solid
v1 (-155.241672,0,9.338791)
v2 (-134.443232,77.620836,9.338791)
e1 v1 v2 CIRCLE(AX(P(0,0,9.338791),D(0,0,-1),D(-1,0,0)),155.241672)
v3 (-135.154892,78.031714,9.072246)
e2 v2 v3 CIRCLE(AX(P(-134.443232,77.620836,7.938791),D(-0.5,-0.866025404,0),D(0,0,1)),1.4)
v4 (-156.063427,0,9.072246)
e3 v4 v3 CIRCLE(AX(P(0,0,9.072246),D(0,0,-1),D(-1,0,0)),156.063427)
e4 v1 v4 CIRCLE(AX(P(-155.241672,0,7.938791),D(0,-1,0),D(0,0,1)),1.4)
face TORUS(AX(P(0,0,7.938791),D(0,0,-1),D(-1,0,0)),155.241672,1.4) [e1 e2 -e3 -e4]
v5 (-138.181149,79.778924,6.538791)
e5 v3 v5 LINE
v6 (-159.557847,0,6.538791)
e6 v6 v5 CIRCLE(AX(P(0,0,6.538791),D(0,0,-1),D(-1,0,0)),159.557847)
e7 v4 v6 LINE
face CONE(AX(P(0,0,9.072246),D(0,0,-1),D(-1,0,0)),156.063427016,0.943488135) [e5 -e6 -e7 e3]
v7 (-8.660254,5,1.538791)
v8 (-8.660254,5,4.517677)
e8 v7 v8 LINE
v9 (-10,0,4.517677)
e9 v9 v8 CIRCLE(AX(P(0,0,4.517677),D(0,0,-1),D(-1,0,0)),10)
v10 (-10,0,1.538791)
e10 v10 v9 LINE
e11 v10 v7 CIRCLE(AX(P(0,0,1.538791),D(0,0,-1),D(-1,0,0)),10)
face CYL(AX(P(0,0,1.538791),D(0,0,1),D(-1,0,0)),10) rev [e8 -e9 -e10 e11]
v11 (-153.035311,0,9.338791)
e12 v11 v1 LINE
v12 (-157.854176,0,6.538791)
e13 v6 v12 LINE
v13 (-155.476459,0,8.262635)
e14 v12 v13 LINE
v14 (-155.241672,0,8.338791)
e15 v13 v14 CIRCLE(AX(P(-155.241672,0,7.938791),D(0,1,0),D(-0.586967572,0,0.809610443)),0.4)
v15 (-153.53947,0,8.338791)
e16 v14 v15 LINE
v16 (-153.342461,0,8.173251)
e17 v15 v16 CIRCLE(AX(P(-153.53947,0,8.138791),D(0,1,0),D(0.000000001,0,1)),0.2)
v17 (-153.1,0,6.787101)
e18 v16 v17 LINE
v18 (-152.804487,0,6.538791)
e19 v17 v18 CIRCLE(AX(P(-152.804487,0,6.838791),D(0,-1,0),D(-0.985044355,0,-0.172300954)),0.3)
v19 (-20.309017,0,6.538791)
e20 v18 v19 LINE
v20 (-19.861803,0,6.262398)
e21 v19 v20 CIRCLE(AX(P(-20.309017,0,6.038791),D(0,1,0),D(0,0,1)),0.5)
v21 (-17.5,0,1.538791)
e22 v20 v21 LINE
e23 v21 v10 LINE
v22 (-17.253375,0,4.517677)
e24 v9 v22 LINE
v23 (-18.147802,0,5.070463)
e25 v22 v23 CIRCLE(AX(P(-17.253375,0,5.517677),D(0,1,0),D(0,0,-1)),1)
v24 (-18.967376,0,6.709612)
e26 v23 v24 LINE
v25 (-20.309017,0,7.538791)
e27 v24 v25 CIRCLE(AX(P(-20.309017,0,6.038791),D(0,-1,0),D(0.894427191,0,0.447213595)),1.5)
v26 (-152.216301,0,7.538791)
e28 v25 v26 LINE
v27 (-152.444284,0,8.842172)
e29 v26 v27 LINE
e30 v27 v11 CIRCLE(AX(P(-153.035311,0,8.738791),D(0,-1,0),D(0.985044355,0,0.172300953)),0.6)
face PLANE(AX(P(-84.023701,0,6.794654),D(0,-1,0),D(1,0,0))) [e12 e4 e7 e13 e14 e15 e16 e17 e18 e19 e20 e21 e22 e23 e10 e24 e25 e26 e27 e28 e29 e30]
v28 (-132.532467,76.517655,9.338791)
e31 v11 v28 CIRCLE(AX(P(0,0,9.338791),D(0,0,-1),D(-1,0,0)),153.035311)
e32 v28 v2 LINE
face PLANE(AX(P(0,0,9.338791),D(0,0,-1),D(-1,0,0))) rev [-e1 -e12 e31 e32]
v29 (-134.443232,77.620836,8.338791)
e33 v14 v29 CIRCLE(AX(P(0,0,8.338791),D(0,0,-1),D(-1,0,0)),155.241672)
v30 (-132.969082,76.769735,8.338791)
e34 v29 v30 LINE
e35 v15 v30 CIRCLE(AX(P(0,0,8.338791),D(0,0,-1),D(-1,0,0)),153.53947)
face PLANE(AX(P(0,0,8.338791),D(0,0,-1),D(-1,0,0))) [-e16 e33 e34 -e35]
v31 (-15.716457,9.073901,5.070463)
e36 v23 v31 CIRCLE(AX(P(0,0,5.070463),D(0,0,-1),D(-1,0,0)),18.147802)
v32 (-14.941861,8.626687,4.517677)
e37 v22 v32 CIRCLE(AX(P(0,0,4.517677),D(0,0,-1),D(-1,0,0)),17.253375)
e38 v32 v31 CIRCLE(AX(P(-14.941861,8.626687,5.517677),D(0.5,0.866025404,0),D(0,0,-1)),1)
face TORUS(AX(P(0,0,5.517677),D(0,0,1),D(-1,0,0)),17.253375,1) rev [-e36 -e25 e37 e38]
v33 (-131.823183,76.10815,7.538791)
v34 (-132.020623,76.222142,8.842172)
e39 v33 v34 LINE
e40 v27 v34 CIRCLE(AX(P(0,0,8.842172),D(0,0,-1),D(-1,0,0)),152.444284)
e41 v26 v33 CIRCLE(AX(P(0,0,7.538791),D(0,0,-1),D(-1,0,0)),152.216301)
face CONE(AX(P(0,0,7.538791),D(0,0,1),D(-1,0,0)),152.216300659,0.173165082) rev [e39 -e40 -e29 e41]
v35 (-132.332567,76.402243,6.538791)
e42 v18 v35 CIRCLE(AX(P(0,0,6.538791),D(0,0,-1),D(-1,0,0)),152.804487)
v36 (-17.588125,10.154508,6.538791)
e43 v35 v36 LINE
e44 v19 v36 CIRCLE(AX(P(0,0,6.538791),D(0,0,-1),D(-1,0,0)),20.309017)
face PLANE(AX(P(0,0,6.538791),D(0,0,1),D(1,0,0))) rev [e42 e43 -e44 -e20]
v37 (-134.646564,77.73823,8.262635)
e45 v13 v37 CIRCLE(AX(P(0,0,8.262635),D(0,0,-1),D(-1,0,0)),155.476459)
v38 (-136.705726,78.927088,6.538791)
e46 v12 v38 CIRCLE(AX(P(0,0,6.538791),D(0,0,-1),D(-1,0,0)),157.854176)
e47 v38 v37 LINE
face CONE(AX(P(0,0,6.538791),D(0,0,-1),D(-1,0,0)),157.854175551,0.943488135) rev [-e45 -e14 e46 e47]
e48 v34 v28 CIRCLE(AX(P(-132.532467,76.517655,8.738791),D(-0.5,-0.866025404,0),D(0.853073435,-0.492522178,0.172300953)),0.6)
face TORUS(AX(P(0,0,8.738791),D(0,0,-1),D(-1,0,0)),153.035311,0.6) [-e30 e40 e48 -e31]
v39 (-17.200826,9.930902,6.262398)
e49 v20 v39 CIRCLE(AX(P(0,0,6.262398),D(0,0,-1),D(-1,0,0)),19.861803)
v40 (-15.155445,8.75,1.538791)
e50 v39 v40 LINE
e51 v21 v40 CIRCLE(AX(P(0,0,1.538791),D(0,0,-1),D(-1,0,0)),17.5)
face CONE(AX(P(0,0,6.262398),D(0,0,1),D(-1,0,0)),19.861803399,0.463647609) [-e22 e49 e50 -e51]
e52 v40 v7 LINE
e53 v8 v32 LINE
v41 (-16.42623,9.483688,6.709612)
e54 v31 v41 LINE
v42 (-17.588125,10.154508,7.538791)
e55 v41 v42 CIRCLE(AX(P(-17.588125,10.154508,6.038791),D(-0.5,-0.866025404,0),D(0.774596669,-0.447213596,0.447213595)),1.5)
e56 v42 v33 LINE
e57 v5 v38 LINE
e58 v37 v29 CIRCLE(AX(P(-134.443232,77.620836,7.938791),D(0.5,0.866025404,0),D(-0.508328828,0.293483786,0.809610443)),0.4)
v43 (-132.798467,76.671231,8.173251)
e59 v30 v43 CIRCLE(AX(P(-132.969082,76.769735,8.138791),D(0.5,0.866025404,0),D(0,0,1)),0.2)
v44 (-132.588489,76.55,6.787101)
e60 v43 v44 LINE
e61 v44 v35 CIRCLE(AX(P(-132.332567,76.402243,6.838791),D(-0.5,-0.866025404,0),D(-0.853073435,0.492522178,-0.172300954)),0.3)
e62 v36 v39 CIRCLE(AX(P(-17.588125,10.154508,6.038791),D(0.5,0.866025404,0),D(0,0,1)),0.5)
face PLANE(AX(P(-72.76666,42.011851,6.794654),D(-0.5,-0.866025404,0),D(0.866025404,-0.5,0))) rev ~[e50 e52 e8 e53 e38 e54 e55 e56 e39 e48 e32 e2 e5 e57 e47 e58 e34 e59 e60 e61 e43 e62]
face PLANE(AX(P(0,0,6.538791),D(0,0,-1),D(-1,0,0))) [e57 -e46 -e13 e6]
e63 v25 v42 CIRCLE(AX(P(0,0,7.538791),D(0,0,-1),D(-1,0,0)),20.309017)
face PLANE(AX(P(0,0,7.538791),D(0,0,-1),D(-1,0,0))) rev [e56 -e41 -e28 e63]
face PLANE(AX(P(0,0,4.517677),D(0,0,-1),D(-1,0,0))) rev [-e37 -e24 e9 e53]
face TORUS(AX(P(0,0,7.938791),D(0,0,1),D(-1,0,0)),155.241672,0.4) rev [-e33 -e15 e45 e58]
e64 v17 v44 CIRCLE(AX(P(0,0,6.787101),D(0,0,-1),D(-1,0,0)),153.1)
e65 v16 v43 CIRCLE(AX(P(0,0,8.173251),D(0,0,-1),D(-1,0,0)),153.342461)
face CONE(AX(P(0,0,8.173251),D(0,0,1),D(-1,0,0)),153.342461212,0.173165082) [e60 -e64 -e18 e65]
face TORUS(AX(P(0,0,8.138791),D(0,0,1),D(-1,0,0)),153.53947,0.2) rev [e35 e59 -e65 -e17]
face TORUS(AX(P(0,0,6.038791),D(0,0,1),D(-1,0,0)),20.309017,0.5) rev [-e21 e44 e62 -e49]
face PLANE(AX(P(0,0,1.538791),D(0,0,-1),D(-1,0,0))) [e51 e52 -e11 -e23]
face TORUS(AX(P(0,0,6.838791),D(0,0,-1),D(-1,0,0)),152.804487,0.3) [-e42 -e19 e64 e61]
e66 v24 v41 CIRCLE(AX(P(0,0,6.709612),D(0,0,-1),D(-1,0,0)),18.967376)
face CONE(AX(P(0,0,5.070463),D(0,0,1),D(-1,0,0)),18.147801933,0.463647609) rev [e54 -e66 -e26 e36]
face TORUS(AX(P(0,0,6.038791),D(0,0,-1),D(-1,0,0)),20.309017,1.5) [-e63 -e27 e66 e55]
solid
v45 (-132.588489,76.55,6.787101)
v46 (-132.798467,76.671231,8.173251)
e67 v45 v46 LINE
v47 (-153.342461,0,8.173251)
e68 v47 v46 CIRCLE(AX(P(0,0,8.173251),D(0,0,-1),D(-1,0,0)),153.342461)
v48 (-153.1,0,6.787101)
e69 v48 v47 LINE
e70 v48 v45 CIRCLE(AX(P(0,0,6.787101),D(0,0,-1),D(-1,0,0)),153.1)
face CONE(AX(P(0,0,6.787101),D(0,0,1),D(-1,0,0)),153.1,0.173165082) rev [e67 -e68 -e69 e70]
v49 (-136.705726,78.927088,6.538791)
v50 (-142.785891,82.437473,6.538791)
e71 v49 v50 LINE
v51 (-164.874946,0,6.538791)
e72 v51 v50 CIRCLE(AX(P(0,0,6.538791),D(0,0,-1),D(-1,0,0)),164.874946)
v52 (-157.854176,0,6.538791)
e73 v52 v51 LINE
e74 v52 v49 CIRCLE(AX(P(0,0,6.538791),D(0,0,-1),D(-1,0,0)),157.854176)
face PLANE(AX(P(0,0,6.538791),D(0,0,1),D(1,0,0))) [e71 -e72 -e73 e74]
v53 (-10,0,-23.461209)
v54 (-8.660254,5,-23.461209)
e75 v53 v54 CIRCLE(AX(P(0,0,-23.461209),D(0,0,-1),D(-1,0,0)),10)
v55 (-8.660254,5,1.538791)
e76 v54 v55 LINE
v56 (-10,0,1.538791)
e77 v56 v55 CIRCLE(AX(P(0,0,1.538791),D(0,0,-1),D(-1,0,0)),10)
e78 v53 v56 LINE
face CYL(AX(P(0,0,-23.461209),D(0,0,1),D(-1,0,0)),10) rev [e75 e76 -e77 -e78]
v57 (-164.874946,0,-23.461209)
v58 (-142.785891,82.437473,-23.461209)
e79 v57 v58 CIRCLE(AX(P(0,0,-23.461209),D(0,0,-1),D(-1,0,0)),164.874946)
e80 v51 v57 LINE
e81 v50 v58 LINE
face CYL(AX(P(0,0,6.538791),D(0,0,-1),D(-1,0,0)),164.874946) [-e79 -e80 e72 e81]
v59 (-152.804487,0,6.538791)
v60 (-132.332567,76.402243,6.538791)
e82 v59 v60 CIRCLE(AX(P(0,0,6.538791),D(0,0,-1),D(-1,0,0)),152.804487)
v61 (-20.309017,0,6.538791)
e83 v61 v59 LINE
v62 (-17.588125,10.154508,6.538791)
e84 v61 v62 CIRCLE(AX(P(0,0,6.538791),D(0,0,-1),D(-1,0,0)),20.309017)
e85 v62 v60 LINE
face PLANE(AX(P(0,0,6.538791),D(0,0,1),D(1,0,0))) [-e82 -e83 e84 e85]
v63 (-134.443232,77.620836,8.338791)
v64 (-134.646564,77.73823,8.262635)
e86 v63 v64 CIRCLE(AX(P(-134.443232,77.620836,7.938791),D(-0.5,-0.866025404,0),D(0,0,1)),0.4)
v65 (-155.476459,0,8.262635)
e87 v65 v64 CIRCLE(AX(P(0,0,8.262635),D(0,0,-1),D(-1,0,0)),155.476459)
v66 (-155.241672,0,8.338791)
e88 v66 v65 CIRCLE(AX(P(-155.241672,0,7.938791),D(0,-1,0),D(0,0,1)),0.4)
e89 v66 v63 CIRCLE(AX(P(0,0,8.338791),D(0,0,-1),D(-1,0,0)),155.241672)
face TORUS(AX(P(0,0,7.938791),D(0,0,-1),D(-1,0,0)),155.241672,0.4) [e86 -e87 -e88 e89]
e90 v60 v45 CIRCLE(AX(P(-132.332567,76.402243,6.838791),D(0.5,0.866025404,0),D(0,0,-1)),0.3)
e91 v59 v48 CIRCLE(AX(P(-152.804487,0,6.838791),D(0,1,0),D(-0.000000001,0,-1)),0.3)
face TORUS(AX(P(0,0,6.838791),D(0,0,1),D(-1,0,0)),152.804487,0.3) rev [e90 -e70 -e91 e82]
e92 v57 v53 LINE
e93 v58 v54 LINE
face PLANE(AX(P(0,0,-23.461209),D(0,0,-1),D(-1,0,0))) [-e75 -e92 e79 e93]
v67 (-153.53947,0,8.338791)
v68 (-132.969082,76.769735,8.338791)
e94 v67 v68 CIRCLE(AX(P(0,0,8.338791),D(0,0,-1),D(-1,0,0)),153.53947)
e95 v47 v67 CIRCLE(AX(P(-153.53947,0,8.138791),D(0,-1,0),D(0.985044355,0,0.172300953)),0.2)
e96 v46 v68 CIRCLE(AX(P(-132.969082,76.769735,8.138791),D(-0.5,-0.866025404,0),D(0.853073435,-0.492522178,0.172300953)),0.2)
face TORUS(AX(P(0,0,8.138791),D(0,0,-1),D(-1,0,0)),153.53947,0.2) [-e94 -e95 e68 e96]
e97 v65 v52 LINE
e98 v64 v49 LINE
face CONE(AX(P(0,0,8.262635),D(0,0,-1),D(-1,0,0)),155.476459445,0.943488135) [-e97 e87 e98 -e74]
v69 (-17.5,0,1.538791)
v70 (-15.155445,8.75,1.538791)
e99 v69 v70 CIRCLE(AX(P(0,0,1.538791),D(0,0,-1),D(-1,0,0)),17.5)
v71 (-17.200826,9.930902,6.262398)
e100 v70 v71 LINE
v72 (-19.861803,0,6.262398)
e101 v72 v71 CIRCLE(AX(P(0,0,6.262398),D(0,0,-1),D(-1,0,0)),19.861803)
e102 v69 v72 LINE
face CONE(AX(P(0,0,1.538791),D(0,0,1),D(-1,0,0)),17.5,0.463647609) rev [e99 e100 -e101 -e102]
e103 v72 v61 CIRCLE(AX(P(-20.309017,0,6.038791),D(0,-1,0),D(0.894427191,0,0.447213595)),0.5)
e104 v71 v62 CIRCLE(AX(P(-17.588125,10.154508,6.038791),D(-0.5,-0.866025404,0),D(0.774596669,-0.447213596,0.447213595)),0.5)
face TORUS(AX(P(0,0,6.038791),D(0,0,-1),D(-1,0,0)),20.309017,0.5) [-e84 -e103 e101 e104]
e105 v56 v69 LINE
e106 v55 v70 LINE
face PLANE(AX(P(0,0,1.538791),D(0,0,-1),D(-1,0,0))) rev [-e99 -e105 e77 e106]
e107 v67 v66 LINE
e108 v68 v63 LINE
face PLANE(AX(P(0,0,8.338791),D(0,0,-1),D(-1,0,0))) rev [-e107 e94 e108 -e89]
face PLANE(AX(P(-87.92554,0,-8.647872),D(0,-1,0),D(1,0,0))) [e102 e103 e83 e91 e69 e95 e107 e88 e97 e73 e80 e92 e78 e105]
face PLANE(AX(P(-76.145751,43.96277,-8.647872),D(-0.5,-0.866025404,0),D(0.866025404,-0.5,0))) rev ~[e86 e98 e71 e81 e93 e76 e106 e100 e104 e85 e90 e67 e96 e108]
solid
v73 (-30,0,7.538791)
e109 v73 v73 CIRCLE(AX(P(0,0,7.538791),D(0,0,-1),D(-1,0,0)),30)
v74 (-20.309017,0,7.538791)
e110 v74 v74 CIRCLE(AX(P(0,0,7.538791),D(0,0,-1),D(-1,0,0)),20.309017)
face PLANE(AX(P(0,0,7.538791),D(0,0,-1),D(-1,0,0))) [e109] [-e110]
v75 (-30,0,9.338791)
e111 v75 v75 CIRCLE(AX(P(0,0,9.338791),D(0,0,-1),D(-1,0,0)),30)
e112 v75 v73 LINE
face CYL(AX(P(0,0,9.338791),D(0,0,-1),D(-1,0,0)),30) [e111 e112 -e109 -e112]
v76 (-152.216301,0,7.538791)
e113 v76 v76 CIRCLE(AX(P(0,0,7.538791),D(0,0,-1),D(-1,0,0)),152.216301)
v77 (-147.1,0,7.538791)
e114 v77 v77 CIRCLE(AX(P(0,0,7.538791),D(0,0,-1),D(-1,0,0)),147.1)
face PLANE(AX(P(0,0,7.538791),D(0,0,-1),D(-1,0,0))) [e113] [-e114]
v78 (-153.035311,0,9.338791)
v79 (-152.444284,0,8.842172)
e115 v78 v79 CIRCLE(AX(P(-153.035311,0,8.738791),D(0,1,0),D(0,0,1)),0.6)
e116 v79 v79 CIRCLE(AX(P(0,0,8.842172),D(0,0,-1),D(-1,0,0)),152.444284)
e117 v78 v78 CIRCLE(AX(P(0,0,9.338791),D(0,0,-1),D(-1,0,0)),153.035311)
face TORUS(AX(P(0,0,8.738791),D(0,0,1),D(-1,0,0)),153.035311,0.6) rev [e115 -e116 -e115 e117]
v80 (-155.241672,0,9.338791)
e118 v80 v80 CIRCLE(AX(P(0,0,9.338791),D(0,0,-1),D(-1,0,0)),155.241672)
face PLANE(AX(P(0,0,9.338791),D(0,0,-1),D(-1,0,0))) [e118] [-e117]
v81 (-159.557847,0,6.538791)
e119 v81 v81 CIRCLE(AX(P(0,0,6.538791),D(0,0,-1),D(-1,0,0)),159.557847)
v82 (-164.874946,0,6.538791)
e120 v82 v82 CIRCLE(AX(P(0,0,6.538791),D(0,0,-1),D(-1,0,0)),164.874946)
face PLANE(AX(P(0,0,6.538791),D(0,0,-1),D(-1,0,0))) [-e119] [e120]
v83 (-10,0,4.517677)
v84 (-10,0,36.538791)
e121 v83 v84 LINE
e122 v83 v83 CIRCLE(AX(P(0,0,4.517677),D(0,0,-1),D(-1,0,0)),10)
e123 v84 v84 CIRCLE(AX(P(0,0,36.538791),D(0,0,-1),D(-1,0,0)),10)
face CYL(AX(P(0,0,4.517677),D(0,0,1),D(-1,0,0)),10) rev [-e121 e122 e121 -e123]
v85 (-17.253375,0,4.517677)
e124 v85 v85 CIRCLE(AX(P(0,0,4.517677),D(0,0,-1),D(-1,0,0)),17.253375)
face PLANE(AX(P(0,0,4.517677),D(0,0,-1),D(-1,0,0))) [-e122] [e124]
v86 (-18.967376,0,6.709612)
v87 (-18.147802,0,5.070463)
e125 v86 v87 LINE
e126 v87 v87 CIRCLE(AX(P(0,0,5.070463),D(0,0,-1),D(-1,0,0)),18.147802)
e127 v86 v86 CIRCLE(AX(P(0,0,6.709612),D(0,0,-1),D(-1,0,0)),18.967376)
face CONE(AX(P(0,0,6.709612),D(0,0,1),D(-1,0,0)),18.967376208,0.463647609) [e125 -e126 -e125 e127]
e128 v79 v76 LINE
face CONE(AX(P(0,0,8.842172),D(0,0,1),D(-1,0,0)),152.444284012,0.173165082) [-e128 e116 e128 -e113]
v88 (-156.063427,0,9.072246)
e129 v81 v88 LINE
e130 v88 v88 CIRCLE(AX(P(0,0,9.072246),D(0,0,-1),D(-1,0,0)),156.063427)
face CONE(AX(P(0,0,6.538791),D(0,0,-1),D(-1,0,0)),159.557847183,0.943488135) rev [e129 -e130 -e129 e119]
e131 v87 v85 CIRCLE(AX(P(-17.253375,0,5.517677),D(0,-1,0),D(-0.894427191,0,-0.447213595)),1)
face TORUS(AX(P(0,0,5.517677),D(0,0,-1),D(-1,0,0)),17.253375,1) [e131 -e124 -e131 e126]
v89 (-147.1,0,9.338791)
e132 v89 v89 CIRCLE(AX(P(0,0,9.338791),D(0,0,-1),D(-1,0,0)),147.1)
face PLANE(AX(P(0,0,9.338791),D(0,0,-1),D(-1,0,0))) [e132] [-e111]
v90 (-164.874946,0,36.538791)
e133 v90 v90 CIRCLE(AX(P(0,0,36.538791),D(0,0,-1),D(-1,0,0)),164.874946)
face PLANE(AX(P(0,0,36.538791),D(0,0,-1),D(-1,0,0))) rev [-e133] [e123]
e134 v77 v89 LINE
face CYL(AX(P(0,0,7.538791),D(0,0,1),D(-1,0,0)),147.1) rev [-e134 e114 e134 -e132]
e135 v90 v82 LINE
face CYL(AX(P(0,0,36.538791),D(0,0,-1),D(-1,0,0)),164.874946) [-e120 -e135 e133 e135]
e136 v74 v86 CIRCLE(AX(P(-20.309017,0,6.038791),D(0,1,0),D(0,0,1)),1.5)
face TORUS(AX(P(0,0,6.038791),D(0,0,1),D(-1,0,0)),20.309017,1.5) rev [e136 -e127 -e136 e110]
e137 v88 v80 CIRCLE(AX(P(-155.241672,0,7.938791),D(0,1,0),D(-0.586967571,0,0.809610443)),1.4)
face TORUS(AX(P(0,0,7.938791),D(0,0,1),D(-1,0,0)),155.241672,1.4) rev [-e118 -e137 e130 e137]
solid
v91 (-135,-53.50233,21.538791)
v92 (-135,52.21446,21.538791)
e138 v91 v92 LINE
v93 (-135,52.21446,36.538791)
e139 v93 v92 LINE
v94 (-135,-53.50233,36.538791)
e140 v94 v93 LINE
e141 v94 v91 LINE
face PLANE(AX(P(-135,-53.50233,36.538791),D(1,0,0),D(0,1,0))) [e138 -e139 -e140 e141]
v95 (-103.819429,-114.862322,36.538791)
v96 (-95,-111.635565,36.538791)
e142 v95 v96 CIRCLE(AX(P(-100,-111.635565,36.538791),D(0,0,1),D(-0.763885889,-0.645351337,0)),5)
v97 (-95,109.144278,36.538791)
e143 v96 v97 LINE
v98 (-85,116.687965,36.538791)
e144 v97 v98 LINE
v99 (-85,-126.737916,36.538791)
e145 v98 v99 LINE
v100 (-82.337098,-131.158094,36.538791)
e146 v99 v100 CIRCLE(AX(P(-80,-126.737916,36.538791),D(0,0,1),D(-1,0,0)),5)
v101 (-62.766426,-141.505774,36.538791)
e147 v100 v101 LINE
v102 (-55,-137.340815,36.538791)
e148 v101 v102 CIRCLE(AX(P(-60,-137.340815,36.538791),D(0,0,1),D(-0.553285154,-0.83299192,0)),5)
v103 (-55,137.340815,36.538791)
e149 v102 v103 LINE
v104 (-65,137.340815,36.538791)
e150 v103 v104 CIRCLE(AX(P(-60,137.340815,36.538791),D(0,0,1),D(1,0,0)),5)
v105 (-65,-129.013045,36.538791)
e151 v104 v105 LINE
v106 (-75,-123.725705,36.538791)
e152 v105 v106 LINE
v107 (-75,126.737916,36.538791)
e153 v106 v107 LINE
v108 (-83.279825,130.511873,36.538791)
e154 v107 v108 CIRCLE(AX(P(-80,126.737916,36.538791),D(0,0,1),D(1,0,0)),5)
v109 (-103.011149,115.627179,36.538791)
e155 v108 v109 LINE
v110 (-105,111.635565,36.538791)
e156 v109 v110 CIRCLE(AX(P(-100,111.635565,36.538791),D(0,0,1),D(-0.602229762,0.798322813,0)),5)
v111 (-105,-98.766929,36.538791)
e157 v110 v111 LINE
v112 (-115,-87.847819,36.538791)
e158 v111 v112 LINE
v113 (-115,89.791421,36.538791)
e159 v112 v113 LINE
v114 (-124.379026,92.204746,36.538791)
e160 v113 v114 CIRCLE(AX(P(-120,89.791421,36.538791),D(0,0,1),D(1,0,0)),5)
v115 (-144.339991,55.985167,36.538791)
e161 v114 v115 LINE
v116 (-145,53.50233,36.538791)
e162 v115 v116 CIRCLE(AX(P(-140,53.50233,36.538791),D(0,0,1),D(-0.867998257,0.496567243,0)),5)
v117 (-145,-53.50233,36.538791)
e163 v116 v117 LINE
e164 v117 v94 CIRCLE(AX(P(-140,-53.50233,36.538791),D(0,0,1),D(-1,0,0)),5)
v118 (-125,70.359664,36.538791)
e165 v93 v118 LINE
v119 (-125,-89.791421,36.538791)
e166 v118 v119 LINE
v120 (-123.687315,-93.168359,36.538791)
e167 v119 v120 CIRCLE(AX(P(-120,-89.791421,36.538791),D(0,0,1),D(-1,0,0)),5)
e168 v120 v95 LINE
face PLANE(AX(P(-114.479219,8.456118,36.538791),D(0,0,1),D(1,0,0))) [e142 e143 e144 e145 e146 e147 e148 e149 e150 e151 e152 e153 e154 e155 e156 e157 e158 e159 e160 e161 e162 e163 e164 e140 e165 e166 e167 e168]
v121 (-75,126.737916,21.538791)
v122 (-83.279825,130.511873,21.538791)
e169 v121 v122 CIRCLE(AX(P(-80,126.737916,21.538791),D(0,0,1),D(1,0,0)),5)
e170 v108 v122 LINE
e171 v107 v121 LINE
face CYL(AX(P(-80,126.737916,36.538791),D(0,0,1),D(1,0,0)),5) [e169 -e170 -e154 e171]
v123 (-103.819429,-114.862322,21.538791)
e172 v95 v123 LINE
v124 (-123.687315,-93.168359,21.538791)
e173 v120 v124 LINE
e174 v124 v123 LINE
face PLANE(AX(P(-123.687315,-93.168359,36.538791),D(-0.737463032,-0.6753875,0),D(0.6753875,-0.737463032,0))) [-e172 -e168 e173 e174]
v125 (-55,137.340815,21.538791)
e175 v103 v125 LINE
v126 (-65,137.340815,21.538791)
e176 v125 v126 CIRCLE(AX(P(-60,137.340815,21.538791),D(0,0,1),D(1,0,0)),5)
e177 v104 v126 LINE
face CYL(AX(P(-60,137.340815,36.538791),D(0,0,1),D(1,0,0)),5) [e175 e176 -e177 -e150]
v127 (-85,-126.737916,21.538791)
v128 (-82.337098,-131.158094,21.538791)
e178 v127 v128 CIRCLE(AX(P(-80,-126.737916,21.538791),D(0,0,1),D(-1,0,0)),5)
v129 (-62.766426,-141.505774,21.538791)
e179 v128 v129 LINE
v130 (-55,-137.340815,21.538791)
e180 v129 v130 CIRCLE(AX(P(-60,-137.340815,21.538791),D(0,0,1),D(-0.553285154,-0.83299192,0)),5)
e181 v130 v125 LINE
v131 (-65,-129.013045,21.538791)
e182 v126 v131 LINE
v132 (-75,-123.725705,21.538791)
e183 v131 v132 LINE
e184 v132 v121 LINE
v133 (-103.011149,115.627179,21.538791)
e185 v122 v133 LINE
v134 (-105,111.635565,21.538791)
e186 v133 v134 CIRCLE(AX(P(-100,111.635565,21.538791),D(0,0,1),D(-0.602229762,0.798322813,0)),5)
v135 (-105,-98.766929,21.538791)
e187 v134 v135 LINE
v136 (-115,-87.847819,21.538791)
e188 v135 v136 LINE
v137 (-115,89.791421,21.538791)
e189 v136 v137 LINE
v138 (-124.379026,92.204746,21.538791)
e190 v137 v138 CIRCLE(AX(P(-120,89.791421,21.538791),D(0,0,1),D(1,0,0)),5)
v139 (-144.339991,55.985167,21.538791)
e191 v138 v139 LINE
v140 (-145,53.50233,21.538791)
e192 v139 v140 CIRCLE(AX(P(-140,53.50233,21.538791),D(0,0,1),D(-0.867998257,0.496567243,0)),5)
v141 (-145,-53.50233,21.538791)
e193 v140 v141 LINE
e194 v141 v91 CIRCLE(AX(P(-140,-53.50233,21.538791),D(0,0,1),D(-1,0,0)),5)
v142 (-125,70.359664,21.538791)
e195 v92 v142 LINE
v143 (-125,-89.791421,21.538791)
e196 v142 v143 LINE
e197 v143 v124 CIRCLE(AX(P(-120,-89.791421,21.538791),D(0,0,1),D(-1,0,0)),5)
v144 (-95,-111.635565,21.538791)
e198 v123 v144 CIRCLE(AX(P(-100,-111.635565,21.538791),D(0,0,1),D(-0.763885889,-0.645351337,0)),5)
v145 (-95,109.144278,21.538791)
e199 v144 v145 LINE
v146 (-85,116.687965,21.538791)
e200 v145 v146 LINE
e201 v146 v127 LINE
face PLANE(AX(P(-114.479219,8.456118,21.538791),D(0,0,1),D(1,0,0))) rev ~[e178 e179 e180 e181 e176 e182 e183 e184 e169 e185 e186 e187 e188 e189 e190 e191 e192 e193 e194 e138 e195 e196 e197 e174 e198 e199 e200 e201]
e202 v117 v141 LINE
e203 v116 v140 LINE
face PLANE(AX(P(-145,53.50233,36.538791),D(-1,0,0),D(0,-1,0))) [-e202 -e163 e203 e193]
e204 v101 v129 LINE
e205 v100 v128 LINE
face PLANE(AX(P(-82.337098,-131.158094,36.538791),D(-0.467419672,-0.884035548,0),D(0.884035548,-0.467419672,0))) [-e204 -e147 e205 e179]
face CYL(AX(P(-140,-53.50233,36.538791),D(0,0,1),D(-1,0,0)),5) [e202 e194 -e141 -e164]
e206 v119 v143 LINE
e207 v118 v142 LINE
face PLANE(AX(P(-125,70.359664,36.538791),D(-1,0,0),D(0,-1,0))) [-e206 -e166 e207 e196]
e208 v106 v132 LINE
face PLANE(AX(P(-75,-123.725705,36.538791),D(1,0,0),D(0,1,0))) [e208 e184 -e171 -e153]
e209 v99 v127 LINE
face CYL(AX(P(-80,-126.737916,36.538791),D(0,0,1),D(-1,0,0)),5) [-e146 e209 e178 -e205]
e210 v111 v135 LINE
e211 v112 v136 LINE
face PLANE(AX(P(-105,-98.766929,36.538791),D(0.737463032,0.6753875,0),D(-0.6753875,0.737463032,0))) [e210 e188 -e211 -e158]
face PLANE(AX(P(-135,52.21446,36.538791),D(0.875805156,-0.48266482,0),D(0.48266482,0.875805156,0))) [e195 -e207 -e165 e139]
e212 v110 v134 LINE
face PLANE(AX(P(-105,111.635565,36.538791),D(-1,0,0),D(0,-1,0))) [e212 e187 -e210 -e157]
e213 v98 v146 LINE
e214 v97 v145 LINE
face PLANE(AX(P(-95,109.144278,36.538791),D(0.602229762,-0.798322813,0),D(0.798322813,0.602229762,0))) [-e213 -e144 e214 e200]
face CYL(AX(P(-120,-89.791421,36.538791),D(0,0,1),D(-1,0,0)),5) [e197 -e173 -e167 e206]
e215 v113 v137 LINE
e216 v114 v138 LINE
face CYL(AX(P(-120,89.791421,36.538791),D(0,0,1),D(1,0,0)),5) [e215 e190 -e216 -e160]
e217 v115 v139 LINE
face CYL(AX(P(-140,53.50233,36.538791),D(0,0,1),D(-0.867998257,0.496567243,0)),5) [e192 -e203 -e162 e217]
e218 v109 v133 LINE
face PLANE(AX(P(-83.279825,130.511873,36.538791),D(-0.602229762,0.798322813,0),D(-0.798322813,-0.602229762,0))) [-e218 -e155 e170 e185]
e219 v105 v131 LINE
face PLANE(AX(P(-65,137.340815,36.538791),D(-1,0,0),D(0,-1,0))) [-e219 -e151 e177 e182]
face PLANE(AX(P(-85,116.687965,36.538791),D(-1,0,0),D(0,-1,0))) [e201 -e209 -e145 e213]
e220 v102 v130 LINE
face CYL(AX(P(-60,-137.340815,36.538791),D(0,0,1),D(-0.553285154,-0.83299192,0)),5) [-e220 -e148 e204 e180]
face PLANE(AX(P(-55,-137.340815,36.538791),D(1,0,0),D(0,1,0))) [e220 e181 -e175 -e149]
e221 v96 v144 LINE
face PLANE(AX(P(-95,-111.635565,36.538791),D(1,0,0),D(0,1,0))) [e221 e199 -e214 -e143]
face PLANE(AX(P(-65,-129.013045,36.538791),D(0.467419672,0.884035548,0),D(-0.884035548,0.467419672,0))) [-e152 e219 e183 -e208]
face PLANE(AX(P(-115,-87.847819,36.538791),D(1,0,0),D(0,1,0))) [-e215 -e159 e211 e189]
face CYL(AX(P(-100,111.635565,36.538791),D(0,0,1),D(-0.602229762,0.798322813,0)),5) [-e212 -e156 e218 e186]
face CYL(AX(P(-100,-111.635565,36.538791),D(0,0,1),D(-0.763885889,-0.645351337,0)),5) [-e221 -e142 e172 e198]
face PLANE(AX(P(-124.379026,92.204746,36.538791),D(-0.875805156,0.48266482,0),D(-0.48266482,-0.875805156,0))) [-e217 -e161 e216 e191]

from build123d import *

# Parameters (mm, degrees)
F1_ANGLE = 30
F2_ANGLE = 30
F6_W     = 5
F6_H     = 200
F6_W_2   = 10
F8_DEPTH = 15


# Not quite as in the source:
# - a feature of the source that left no trace in its solid (it failed there, or was rolled back) is left out


with BuildPart() as f1:
    # F0 (on Front) → F1 (revolve)
    with BuildSketch(Plane.XZ):
        with BuildLine():
            Line((-147.1, 6.5387912874), (-152.8044866935, 6.5387912874))
            Line((-152.8044866935, 6.5387912874), (-157.8541755513, 6.5387912874))
            Line((-157.8541755513, 6.5387912874), (-159.5578471827, 6.5387912874))
            Line((-159.5578471827, 6.5387912874), (-164.874945747, 6.5387912874))
            Line((-164.874945747, 6.5387912874), (-164.874945747, 1.4487328955))
            Line((-164.874945747, 1.4487328955), (-164.874945747, -23.4612087126))
            Line((-164.874945747, -23.4612087126), (-10, -23.4612087126))
            Line((-10, -23.4612087126), (-10, -7.7473968267))
            Line((-10, -7.7473968267), (-10, -3.4612087126))
            Line((-10, -3.4612087126), (-10, 1.5387912874))
            Line((-10, 1.5387912874), (-17.5, 1.5387912874))
            Line((-17.5, 1.5387912874), (-19.8618033989, 6.2623980851))
            ThreePointArc((-19.8618033989, 6.2623980851), (-20.0461514383, 6.4641166916), (-20.3090169944, 6.5387912874))
            Line((-20.3090169944, 6.5387912874), (-30, 6.5387912874))
            Line((-30, 6.5387912874), (-147.1, 6.5387912874))
        make_face()
        with BuildLine():
            Line((-157.8541755513, 6.5387912874), (-152.8044866935, 6.5387912874))
            ThreePointArc((-152.8044866935, 6.5387912874), (-152.9974801055, 6.6091098931), (-153.1, 6.7871010014))
            Line((-153.1, 6.7871010014), (-153.3424612123, 8.173251478))
            ThreePointArc((-153.3424612123, 8.173251478), (-153.4108078086, 8.2919122169), (-153.5394700833, 8.3387912874))
            Line((-153.5394700833, 8.3387912874), (-154.3905712497, 8.3387912874))
            Line((-154.3905712497, 8.3387912874), (-155.2416724161, 8.3387912874))
            ThreePointArc((-155.2416724161, 8.3387912874), (-155.3650870202, 8.3192762877), (-155.4764594446, 8.2626354647))
            Line((-155.4764594446, 8.2626354647), (-157.8541755513, 6.5387912874))
        make_face()
    revolve(axis=Axis((0, 0, -0.2536289394), (0, 0, -1)), revolution_arc=F1_ANGLE)


with BuildPart() as f2:
    # F0 (on Front) → F2 (revolve)
    with BuildSketch(Plane.XZ):
        with BuildLine():
            ThreePointArc((-153.1, 6.7871010014), (-152.9974801055, 6.6091098931), (-152.8044866935, 6.5387912874))
            Line((-152.8044866935, 6.5387912874), (-147.1, 6.5387912874))
            Line((-147.1, 6.5387912874), (-30, 6.5387912874))
            Line((-30, 6.5387912874), (-20.3090169944, 6.5387912874))
            ThreePointArc((-20.3090169944, 6.5387912874), (-20.0461514383, 6.4641166916), (-19.8618033989, 6.2623980851))
            Line((-19.8618033989, 6.2623980851), (-17.5, 1.5387912874))
            Line((-17.5, 1.5387912874), (-10, 1.5387912874))
            Line((-10, 1.5387912874), (-10, 4.5176767256))
            Line((-10, 4.5176767256), (-17.2533747416, 4.5176767256))
            ThreePointArc((-17.2533747416, 4.5176767256), (-17.7791058537, 4.6670259172), (-18.1478019326, 5.0704631301))
            Line((-18.1478019326, 5.0704631301), (-18.9673762079, 6.7096116806))
            ThreePointArc((-18.9673762079, 6.7096116806), (-19.5204203262, 7.3147674999), (-20.3090169944, 7.5387912874))
            Line((-20.3090169944, 7.5387912874), (-30, 7.5387912874))
            Line((-30, 7.5387912874), (-147.1, 7.5387912874))
            Line((-147.1, 7.5387912874), (-152.2163006593, 7.5387912874))
            Line((-152.2163006593, 7.5387912874), (-152.4442840123, 8.8421718593))
            ThreePointArc((-152.4442840123, 8.8421718593), (-152.6493238012, 9.198154076), (-153.0353106254, 9.3387912874))
            Line((-153.0353106254, 9.3387912874), (-155.2416724161, 9.3387912874))
            ThreePointArc((-155.2416724161, 9.3387912874), (-155.6736235307, 9.2704887885), (-156.0634270161, 9.0722459081))
            Line((-156.0634270161, 9.0722459081), (-159.5578471827, 6.5387912874))
            Line((-159.5578471827, 6.5387912874), (-157.8541755513, 6.5387912874))
            Line((-157.8541755513, 6.5387912874), (-155.4764594446, 8.2626354647))
            ThreePointArc((-155.4764594446, 8.2626354647), (-155.3650870202, 8.3192762877), (-155.2416724161, 8.3387912874))
            Line((-155.2416724161, 8.3387912874), (-154.3905712497, 8.3387912874))
            Line((-154.3905712497, 8.3387912874), (-153.5394700833, 8.3387912874))
            ThreePointArc((-153.5394700833, 8.3387912874), (-153.4108078086, 8.2919122169), (-153.3424612123, 8.173251478))
            Line((-153.3424612123, 8.173251478), (-153.1, 6.7871010014))
        make_face()
    revolve(axis=Axis((0, 0, -0.2536289394), (0, 0, -1)), revolution_arc=F2_ANGLE)


with BuildPart() as f2_1:
    # F3: moved
    add(f2.part)


with BuildPart() as f4:
    # F0 (on Front) → F4 (revolve)
    with BuildSketch(Plane.XZ):
        with BuildLine():
            Line((-164.874945747, 6.5387912874), (-159.5578471827, 6.5387912874))
            Line((-159.5578471827, 6.5387912874), (-156.0634270161, 9.0722459081))
            ThreePointArc((-156.0634270161, 9.0722459081), (-155.6736235307, 9.2704887885), (-155.2416724161, 9.3387912874))
            Line((-155.2416724161, 9.3387912874), (-153.0353106254, 9.3387912874))
            ThreePointArc((-153.0353106254, 9.3387912874), (-152.6493238012, 9.198154076), (-152.4442840123, 8.8421718593))
            Line((-152.4442840123, 8.8421718593), (-152.2163006593, 7.5387912874))
            Line((-152.2163006593, 7.5387912874), (-147.1, 7.5387912874))
            Line((-147.1, 7.5387912874), (-147.1, 9.3387912874))
            Line((-147.1, 9.3387912874), (-30, 9.3387912874))
            Line((-30, 9.3387912874), (-30, 7.5387912874))
            Line((-30, 7.5387912874), (-20.3090169944, 7.5387912874))
            ThreePointArc((-20.3090169944, 7.5387912874), (-19.5204203262, 7.3147674999), (-18.9673762079, 6.7096116806))
            Line((-18.9673762079, 6.7096116806), (-18.1478019326, 5.0704631301))
            ThreePointArc((-18.1478019326, 5.0704631301), (-17.7791058537, 4.6670259172), (-17.2533747416, 4.5176767256))
            Line((-17.2533747416, 4.5176767256), (-10, 4.5176767256))
            Line((-10, 4.5176767256), (-10, 8.3387912874))
            Line((-10, 8.3387912874), (-10, 36.5387912874))
            Line((-10, 36.5387912874), (-164.874945747, 36.5387912874))
            Line((-164.874945747, 36.5387912874), (-164.874945747, 6.5387912874))
        make_face()
    revolve(axis=Axis((0, 0, -0.2536289394), (0, 0, -1)))


with BuildPart() as f4_1:
    # F5: moved
    add(f4.part)


with BuildPart() as f8:
    # F6 (on face) → F8 (new body)
    with BuildSketch(Plane.XY.offset(36.5387912874)):
        with BuildLine():
            Line((-85, 100), (-75, 100))
            Line((-75, 100), (-75, 126.737916042))
            ThreePointArc((-75, 126.737916042), (-77.9262502449, 131.2875931683), (-83.2798247813, 130.5118727725))
            Line((-83.2798247813, 130.5118727725), (-103.0111488123, 115.6271790176))
            ThreePointArc((-103.0111488123, 115.6271790176), (-104.4752510578, 113.8653918465), (-105, 111.6355649543))
            Line((-105, 111.6355649543), (-105, -98.7669287982))
            Line((-105, -98.7669287982), (-115, -87.8478189262))
            Line((-115, -87.8478189262), (-115, 89.7914214314))
            ThreePointArc((-115, 89.7914214314), (-118.7540322851, 94.6336899548), (-124.3790257813, 92.2047455303))
            Line((-124.3790257813, 92.2047455303), (-144.3399912833, 55.9851666545))
            ThreePointArc((-144.3399912833, 55.9851666545), (-144.8321815165, 54.7868621817), (-145, 53.5023304414))
            Line((-145, 53.5023304414), (-145, -53.5023304414))
            ThreePointArc((-145, -53.5023304414), (-140, -58.5023304414), (-135, -53.5023304414))
            Line((-135, -53.5023304414), (-135, 52.2144599446))
            Line((-135, 52.2144599446), (-125, 70.3596638287))
            Line((-125, 70.3596638287), (-125, -89.7914214314))
            ThreePointArc((-125, -89.7914214314), (-124.6602883929, -91.6029710704), (-123.6873151621, -93.1683589338))
            Line((-123.6873151621, -93.1683589338), (-103.819429446, -114.8623216397))
            ThreePointArc((-103.819429446, -114.8623216397), (-98.2820284097, -116.3311558239), (-95, -111.6355649543))
            Line((-95, -111.6355649543), (-95, -100))
            Line((-95, -100), (-100, -100))
            Line((-100, -100), (-100, 100))
            Line((-100, 100), (-95, 100))
            Line((-95, 100), (-95, 109.144278026))
            Line((-95, 109.144278026), (-85, 116.6879652776))
            Line((-85, 116.6879652776), (-85, 100))
        make_face()
        with Locations((-97.5, 0)):
            Rectangle(F6_W, F6_H)
        with Locations((-80, 0)):
            Rectangle(F6_W_2, F6_H)
        with BuildLine():
            Line((-55, -137.3408146279), (-55, -100))
            Line((-55, -100), (-65, -100))
            Line((-65, -100), (-65, -129.0130452242))
            Line((-65, -129.0130452242), (-75, -123.7257049977))
            Line((-75, -123.7257049977), (-75, -100))
            Line((-75, -100), (-85, -100))
            Line((-85, -100), (-85, -126.737916042))
            ThreePointArc((-85, -126.737916042), (-84.2828432022, -129.3180815609), (-82.337098358, -131.1580937833))
            Line((-82.337098358, -131.1580937833), (-62.7664257697, -141.5057742269))
            ThreePointArc((-62.7664257697, -141.5057742269), (-57.6369647536, -141.7471809795), (-55, -137.3408146279))
        make_face()
        with Locations((-60, 0)):
            Rectangle(F6_W_2, F6_H)
        with BuildLine():
            Line((-65, 100), (-55, 100))
            Line((-55, 100), (-55, 137.3408146279))
            ThreePointArc((-55, 137.3408146279), (-60, 142.3408146279), (-65, 137.3408146279))
            Line((-65, 137.3408146279), (-65, 100))
        make_face()
    extrude(amount=-F8_DEPTH)


solid = Compound([f1.part, f2_1.part, f4_1.part, f8.part])
